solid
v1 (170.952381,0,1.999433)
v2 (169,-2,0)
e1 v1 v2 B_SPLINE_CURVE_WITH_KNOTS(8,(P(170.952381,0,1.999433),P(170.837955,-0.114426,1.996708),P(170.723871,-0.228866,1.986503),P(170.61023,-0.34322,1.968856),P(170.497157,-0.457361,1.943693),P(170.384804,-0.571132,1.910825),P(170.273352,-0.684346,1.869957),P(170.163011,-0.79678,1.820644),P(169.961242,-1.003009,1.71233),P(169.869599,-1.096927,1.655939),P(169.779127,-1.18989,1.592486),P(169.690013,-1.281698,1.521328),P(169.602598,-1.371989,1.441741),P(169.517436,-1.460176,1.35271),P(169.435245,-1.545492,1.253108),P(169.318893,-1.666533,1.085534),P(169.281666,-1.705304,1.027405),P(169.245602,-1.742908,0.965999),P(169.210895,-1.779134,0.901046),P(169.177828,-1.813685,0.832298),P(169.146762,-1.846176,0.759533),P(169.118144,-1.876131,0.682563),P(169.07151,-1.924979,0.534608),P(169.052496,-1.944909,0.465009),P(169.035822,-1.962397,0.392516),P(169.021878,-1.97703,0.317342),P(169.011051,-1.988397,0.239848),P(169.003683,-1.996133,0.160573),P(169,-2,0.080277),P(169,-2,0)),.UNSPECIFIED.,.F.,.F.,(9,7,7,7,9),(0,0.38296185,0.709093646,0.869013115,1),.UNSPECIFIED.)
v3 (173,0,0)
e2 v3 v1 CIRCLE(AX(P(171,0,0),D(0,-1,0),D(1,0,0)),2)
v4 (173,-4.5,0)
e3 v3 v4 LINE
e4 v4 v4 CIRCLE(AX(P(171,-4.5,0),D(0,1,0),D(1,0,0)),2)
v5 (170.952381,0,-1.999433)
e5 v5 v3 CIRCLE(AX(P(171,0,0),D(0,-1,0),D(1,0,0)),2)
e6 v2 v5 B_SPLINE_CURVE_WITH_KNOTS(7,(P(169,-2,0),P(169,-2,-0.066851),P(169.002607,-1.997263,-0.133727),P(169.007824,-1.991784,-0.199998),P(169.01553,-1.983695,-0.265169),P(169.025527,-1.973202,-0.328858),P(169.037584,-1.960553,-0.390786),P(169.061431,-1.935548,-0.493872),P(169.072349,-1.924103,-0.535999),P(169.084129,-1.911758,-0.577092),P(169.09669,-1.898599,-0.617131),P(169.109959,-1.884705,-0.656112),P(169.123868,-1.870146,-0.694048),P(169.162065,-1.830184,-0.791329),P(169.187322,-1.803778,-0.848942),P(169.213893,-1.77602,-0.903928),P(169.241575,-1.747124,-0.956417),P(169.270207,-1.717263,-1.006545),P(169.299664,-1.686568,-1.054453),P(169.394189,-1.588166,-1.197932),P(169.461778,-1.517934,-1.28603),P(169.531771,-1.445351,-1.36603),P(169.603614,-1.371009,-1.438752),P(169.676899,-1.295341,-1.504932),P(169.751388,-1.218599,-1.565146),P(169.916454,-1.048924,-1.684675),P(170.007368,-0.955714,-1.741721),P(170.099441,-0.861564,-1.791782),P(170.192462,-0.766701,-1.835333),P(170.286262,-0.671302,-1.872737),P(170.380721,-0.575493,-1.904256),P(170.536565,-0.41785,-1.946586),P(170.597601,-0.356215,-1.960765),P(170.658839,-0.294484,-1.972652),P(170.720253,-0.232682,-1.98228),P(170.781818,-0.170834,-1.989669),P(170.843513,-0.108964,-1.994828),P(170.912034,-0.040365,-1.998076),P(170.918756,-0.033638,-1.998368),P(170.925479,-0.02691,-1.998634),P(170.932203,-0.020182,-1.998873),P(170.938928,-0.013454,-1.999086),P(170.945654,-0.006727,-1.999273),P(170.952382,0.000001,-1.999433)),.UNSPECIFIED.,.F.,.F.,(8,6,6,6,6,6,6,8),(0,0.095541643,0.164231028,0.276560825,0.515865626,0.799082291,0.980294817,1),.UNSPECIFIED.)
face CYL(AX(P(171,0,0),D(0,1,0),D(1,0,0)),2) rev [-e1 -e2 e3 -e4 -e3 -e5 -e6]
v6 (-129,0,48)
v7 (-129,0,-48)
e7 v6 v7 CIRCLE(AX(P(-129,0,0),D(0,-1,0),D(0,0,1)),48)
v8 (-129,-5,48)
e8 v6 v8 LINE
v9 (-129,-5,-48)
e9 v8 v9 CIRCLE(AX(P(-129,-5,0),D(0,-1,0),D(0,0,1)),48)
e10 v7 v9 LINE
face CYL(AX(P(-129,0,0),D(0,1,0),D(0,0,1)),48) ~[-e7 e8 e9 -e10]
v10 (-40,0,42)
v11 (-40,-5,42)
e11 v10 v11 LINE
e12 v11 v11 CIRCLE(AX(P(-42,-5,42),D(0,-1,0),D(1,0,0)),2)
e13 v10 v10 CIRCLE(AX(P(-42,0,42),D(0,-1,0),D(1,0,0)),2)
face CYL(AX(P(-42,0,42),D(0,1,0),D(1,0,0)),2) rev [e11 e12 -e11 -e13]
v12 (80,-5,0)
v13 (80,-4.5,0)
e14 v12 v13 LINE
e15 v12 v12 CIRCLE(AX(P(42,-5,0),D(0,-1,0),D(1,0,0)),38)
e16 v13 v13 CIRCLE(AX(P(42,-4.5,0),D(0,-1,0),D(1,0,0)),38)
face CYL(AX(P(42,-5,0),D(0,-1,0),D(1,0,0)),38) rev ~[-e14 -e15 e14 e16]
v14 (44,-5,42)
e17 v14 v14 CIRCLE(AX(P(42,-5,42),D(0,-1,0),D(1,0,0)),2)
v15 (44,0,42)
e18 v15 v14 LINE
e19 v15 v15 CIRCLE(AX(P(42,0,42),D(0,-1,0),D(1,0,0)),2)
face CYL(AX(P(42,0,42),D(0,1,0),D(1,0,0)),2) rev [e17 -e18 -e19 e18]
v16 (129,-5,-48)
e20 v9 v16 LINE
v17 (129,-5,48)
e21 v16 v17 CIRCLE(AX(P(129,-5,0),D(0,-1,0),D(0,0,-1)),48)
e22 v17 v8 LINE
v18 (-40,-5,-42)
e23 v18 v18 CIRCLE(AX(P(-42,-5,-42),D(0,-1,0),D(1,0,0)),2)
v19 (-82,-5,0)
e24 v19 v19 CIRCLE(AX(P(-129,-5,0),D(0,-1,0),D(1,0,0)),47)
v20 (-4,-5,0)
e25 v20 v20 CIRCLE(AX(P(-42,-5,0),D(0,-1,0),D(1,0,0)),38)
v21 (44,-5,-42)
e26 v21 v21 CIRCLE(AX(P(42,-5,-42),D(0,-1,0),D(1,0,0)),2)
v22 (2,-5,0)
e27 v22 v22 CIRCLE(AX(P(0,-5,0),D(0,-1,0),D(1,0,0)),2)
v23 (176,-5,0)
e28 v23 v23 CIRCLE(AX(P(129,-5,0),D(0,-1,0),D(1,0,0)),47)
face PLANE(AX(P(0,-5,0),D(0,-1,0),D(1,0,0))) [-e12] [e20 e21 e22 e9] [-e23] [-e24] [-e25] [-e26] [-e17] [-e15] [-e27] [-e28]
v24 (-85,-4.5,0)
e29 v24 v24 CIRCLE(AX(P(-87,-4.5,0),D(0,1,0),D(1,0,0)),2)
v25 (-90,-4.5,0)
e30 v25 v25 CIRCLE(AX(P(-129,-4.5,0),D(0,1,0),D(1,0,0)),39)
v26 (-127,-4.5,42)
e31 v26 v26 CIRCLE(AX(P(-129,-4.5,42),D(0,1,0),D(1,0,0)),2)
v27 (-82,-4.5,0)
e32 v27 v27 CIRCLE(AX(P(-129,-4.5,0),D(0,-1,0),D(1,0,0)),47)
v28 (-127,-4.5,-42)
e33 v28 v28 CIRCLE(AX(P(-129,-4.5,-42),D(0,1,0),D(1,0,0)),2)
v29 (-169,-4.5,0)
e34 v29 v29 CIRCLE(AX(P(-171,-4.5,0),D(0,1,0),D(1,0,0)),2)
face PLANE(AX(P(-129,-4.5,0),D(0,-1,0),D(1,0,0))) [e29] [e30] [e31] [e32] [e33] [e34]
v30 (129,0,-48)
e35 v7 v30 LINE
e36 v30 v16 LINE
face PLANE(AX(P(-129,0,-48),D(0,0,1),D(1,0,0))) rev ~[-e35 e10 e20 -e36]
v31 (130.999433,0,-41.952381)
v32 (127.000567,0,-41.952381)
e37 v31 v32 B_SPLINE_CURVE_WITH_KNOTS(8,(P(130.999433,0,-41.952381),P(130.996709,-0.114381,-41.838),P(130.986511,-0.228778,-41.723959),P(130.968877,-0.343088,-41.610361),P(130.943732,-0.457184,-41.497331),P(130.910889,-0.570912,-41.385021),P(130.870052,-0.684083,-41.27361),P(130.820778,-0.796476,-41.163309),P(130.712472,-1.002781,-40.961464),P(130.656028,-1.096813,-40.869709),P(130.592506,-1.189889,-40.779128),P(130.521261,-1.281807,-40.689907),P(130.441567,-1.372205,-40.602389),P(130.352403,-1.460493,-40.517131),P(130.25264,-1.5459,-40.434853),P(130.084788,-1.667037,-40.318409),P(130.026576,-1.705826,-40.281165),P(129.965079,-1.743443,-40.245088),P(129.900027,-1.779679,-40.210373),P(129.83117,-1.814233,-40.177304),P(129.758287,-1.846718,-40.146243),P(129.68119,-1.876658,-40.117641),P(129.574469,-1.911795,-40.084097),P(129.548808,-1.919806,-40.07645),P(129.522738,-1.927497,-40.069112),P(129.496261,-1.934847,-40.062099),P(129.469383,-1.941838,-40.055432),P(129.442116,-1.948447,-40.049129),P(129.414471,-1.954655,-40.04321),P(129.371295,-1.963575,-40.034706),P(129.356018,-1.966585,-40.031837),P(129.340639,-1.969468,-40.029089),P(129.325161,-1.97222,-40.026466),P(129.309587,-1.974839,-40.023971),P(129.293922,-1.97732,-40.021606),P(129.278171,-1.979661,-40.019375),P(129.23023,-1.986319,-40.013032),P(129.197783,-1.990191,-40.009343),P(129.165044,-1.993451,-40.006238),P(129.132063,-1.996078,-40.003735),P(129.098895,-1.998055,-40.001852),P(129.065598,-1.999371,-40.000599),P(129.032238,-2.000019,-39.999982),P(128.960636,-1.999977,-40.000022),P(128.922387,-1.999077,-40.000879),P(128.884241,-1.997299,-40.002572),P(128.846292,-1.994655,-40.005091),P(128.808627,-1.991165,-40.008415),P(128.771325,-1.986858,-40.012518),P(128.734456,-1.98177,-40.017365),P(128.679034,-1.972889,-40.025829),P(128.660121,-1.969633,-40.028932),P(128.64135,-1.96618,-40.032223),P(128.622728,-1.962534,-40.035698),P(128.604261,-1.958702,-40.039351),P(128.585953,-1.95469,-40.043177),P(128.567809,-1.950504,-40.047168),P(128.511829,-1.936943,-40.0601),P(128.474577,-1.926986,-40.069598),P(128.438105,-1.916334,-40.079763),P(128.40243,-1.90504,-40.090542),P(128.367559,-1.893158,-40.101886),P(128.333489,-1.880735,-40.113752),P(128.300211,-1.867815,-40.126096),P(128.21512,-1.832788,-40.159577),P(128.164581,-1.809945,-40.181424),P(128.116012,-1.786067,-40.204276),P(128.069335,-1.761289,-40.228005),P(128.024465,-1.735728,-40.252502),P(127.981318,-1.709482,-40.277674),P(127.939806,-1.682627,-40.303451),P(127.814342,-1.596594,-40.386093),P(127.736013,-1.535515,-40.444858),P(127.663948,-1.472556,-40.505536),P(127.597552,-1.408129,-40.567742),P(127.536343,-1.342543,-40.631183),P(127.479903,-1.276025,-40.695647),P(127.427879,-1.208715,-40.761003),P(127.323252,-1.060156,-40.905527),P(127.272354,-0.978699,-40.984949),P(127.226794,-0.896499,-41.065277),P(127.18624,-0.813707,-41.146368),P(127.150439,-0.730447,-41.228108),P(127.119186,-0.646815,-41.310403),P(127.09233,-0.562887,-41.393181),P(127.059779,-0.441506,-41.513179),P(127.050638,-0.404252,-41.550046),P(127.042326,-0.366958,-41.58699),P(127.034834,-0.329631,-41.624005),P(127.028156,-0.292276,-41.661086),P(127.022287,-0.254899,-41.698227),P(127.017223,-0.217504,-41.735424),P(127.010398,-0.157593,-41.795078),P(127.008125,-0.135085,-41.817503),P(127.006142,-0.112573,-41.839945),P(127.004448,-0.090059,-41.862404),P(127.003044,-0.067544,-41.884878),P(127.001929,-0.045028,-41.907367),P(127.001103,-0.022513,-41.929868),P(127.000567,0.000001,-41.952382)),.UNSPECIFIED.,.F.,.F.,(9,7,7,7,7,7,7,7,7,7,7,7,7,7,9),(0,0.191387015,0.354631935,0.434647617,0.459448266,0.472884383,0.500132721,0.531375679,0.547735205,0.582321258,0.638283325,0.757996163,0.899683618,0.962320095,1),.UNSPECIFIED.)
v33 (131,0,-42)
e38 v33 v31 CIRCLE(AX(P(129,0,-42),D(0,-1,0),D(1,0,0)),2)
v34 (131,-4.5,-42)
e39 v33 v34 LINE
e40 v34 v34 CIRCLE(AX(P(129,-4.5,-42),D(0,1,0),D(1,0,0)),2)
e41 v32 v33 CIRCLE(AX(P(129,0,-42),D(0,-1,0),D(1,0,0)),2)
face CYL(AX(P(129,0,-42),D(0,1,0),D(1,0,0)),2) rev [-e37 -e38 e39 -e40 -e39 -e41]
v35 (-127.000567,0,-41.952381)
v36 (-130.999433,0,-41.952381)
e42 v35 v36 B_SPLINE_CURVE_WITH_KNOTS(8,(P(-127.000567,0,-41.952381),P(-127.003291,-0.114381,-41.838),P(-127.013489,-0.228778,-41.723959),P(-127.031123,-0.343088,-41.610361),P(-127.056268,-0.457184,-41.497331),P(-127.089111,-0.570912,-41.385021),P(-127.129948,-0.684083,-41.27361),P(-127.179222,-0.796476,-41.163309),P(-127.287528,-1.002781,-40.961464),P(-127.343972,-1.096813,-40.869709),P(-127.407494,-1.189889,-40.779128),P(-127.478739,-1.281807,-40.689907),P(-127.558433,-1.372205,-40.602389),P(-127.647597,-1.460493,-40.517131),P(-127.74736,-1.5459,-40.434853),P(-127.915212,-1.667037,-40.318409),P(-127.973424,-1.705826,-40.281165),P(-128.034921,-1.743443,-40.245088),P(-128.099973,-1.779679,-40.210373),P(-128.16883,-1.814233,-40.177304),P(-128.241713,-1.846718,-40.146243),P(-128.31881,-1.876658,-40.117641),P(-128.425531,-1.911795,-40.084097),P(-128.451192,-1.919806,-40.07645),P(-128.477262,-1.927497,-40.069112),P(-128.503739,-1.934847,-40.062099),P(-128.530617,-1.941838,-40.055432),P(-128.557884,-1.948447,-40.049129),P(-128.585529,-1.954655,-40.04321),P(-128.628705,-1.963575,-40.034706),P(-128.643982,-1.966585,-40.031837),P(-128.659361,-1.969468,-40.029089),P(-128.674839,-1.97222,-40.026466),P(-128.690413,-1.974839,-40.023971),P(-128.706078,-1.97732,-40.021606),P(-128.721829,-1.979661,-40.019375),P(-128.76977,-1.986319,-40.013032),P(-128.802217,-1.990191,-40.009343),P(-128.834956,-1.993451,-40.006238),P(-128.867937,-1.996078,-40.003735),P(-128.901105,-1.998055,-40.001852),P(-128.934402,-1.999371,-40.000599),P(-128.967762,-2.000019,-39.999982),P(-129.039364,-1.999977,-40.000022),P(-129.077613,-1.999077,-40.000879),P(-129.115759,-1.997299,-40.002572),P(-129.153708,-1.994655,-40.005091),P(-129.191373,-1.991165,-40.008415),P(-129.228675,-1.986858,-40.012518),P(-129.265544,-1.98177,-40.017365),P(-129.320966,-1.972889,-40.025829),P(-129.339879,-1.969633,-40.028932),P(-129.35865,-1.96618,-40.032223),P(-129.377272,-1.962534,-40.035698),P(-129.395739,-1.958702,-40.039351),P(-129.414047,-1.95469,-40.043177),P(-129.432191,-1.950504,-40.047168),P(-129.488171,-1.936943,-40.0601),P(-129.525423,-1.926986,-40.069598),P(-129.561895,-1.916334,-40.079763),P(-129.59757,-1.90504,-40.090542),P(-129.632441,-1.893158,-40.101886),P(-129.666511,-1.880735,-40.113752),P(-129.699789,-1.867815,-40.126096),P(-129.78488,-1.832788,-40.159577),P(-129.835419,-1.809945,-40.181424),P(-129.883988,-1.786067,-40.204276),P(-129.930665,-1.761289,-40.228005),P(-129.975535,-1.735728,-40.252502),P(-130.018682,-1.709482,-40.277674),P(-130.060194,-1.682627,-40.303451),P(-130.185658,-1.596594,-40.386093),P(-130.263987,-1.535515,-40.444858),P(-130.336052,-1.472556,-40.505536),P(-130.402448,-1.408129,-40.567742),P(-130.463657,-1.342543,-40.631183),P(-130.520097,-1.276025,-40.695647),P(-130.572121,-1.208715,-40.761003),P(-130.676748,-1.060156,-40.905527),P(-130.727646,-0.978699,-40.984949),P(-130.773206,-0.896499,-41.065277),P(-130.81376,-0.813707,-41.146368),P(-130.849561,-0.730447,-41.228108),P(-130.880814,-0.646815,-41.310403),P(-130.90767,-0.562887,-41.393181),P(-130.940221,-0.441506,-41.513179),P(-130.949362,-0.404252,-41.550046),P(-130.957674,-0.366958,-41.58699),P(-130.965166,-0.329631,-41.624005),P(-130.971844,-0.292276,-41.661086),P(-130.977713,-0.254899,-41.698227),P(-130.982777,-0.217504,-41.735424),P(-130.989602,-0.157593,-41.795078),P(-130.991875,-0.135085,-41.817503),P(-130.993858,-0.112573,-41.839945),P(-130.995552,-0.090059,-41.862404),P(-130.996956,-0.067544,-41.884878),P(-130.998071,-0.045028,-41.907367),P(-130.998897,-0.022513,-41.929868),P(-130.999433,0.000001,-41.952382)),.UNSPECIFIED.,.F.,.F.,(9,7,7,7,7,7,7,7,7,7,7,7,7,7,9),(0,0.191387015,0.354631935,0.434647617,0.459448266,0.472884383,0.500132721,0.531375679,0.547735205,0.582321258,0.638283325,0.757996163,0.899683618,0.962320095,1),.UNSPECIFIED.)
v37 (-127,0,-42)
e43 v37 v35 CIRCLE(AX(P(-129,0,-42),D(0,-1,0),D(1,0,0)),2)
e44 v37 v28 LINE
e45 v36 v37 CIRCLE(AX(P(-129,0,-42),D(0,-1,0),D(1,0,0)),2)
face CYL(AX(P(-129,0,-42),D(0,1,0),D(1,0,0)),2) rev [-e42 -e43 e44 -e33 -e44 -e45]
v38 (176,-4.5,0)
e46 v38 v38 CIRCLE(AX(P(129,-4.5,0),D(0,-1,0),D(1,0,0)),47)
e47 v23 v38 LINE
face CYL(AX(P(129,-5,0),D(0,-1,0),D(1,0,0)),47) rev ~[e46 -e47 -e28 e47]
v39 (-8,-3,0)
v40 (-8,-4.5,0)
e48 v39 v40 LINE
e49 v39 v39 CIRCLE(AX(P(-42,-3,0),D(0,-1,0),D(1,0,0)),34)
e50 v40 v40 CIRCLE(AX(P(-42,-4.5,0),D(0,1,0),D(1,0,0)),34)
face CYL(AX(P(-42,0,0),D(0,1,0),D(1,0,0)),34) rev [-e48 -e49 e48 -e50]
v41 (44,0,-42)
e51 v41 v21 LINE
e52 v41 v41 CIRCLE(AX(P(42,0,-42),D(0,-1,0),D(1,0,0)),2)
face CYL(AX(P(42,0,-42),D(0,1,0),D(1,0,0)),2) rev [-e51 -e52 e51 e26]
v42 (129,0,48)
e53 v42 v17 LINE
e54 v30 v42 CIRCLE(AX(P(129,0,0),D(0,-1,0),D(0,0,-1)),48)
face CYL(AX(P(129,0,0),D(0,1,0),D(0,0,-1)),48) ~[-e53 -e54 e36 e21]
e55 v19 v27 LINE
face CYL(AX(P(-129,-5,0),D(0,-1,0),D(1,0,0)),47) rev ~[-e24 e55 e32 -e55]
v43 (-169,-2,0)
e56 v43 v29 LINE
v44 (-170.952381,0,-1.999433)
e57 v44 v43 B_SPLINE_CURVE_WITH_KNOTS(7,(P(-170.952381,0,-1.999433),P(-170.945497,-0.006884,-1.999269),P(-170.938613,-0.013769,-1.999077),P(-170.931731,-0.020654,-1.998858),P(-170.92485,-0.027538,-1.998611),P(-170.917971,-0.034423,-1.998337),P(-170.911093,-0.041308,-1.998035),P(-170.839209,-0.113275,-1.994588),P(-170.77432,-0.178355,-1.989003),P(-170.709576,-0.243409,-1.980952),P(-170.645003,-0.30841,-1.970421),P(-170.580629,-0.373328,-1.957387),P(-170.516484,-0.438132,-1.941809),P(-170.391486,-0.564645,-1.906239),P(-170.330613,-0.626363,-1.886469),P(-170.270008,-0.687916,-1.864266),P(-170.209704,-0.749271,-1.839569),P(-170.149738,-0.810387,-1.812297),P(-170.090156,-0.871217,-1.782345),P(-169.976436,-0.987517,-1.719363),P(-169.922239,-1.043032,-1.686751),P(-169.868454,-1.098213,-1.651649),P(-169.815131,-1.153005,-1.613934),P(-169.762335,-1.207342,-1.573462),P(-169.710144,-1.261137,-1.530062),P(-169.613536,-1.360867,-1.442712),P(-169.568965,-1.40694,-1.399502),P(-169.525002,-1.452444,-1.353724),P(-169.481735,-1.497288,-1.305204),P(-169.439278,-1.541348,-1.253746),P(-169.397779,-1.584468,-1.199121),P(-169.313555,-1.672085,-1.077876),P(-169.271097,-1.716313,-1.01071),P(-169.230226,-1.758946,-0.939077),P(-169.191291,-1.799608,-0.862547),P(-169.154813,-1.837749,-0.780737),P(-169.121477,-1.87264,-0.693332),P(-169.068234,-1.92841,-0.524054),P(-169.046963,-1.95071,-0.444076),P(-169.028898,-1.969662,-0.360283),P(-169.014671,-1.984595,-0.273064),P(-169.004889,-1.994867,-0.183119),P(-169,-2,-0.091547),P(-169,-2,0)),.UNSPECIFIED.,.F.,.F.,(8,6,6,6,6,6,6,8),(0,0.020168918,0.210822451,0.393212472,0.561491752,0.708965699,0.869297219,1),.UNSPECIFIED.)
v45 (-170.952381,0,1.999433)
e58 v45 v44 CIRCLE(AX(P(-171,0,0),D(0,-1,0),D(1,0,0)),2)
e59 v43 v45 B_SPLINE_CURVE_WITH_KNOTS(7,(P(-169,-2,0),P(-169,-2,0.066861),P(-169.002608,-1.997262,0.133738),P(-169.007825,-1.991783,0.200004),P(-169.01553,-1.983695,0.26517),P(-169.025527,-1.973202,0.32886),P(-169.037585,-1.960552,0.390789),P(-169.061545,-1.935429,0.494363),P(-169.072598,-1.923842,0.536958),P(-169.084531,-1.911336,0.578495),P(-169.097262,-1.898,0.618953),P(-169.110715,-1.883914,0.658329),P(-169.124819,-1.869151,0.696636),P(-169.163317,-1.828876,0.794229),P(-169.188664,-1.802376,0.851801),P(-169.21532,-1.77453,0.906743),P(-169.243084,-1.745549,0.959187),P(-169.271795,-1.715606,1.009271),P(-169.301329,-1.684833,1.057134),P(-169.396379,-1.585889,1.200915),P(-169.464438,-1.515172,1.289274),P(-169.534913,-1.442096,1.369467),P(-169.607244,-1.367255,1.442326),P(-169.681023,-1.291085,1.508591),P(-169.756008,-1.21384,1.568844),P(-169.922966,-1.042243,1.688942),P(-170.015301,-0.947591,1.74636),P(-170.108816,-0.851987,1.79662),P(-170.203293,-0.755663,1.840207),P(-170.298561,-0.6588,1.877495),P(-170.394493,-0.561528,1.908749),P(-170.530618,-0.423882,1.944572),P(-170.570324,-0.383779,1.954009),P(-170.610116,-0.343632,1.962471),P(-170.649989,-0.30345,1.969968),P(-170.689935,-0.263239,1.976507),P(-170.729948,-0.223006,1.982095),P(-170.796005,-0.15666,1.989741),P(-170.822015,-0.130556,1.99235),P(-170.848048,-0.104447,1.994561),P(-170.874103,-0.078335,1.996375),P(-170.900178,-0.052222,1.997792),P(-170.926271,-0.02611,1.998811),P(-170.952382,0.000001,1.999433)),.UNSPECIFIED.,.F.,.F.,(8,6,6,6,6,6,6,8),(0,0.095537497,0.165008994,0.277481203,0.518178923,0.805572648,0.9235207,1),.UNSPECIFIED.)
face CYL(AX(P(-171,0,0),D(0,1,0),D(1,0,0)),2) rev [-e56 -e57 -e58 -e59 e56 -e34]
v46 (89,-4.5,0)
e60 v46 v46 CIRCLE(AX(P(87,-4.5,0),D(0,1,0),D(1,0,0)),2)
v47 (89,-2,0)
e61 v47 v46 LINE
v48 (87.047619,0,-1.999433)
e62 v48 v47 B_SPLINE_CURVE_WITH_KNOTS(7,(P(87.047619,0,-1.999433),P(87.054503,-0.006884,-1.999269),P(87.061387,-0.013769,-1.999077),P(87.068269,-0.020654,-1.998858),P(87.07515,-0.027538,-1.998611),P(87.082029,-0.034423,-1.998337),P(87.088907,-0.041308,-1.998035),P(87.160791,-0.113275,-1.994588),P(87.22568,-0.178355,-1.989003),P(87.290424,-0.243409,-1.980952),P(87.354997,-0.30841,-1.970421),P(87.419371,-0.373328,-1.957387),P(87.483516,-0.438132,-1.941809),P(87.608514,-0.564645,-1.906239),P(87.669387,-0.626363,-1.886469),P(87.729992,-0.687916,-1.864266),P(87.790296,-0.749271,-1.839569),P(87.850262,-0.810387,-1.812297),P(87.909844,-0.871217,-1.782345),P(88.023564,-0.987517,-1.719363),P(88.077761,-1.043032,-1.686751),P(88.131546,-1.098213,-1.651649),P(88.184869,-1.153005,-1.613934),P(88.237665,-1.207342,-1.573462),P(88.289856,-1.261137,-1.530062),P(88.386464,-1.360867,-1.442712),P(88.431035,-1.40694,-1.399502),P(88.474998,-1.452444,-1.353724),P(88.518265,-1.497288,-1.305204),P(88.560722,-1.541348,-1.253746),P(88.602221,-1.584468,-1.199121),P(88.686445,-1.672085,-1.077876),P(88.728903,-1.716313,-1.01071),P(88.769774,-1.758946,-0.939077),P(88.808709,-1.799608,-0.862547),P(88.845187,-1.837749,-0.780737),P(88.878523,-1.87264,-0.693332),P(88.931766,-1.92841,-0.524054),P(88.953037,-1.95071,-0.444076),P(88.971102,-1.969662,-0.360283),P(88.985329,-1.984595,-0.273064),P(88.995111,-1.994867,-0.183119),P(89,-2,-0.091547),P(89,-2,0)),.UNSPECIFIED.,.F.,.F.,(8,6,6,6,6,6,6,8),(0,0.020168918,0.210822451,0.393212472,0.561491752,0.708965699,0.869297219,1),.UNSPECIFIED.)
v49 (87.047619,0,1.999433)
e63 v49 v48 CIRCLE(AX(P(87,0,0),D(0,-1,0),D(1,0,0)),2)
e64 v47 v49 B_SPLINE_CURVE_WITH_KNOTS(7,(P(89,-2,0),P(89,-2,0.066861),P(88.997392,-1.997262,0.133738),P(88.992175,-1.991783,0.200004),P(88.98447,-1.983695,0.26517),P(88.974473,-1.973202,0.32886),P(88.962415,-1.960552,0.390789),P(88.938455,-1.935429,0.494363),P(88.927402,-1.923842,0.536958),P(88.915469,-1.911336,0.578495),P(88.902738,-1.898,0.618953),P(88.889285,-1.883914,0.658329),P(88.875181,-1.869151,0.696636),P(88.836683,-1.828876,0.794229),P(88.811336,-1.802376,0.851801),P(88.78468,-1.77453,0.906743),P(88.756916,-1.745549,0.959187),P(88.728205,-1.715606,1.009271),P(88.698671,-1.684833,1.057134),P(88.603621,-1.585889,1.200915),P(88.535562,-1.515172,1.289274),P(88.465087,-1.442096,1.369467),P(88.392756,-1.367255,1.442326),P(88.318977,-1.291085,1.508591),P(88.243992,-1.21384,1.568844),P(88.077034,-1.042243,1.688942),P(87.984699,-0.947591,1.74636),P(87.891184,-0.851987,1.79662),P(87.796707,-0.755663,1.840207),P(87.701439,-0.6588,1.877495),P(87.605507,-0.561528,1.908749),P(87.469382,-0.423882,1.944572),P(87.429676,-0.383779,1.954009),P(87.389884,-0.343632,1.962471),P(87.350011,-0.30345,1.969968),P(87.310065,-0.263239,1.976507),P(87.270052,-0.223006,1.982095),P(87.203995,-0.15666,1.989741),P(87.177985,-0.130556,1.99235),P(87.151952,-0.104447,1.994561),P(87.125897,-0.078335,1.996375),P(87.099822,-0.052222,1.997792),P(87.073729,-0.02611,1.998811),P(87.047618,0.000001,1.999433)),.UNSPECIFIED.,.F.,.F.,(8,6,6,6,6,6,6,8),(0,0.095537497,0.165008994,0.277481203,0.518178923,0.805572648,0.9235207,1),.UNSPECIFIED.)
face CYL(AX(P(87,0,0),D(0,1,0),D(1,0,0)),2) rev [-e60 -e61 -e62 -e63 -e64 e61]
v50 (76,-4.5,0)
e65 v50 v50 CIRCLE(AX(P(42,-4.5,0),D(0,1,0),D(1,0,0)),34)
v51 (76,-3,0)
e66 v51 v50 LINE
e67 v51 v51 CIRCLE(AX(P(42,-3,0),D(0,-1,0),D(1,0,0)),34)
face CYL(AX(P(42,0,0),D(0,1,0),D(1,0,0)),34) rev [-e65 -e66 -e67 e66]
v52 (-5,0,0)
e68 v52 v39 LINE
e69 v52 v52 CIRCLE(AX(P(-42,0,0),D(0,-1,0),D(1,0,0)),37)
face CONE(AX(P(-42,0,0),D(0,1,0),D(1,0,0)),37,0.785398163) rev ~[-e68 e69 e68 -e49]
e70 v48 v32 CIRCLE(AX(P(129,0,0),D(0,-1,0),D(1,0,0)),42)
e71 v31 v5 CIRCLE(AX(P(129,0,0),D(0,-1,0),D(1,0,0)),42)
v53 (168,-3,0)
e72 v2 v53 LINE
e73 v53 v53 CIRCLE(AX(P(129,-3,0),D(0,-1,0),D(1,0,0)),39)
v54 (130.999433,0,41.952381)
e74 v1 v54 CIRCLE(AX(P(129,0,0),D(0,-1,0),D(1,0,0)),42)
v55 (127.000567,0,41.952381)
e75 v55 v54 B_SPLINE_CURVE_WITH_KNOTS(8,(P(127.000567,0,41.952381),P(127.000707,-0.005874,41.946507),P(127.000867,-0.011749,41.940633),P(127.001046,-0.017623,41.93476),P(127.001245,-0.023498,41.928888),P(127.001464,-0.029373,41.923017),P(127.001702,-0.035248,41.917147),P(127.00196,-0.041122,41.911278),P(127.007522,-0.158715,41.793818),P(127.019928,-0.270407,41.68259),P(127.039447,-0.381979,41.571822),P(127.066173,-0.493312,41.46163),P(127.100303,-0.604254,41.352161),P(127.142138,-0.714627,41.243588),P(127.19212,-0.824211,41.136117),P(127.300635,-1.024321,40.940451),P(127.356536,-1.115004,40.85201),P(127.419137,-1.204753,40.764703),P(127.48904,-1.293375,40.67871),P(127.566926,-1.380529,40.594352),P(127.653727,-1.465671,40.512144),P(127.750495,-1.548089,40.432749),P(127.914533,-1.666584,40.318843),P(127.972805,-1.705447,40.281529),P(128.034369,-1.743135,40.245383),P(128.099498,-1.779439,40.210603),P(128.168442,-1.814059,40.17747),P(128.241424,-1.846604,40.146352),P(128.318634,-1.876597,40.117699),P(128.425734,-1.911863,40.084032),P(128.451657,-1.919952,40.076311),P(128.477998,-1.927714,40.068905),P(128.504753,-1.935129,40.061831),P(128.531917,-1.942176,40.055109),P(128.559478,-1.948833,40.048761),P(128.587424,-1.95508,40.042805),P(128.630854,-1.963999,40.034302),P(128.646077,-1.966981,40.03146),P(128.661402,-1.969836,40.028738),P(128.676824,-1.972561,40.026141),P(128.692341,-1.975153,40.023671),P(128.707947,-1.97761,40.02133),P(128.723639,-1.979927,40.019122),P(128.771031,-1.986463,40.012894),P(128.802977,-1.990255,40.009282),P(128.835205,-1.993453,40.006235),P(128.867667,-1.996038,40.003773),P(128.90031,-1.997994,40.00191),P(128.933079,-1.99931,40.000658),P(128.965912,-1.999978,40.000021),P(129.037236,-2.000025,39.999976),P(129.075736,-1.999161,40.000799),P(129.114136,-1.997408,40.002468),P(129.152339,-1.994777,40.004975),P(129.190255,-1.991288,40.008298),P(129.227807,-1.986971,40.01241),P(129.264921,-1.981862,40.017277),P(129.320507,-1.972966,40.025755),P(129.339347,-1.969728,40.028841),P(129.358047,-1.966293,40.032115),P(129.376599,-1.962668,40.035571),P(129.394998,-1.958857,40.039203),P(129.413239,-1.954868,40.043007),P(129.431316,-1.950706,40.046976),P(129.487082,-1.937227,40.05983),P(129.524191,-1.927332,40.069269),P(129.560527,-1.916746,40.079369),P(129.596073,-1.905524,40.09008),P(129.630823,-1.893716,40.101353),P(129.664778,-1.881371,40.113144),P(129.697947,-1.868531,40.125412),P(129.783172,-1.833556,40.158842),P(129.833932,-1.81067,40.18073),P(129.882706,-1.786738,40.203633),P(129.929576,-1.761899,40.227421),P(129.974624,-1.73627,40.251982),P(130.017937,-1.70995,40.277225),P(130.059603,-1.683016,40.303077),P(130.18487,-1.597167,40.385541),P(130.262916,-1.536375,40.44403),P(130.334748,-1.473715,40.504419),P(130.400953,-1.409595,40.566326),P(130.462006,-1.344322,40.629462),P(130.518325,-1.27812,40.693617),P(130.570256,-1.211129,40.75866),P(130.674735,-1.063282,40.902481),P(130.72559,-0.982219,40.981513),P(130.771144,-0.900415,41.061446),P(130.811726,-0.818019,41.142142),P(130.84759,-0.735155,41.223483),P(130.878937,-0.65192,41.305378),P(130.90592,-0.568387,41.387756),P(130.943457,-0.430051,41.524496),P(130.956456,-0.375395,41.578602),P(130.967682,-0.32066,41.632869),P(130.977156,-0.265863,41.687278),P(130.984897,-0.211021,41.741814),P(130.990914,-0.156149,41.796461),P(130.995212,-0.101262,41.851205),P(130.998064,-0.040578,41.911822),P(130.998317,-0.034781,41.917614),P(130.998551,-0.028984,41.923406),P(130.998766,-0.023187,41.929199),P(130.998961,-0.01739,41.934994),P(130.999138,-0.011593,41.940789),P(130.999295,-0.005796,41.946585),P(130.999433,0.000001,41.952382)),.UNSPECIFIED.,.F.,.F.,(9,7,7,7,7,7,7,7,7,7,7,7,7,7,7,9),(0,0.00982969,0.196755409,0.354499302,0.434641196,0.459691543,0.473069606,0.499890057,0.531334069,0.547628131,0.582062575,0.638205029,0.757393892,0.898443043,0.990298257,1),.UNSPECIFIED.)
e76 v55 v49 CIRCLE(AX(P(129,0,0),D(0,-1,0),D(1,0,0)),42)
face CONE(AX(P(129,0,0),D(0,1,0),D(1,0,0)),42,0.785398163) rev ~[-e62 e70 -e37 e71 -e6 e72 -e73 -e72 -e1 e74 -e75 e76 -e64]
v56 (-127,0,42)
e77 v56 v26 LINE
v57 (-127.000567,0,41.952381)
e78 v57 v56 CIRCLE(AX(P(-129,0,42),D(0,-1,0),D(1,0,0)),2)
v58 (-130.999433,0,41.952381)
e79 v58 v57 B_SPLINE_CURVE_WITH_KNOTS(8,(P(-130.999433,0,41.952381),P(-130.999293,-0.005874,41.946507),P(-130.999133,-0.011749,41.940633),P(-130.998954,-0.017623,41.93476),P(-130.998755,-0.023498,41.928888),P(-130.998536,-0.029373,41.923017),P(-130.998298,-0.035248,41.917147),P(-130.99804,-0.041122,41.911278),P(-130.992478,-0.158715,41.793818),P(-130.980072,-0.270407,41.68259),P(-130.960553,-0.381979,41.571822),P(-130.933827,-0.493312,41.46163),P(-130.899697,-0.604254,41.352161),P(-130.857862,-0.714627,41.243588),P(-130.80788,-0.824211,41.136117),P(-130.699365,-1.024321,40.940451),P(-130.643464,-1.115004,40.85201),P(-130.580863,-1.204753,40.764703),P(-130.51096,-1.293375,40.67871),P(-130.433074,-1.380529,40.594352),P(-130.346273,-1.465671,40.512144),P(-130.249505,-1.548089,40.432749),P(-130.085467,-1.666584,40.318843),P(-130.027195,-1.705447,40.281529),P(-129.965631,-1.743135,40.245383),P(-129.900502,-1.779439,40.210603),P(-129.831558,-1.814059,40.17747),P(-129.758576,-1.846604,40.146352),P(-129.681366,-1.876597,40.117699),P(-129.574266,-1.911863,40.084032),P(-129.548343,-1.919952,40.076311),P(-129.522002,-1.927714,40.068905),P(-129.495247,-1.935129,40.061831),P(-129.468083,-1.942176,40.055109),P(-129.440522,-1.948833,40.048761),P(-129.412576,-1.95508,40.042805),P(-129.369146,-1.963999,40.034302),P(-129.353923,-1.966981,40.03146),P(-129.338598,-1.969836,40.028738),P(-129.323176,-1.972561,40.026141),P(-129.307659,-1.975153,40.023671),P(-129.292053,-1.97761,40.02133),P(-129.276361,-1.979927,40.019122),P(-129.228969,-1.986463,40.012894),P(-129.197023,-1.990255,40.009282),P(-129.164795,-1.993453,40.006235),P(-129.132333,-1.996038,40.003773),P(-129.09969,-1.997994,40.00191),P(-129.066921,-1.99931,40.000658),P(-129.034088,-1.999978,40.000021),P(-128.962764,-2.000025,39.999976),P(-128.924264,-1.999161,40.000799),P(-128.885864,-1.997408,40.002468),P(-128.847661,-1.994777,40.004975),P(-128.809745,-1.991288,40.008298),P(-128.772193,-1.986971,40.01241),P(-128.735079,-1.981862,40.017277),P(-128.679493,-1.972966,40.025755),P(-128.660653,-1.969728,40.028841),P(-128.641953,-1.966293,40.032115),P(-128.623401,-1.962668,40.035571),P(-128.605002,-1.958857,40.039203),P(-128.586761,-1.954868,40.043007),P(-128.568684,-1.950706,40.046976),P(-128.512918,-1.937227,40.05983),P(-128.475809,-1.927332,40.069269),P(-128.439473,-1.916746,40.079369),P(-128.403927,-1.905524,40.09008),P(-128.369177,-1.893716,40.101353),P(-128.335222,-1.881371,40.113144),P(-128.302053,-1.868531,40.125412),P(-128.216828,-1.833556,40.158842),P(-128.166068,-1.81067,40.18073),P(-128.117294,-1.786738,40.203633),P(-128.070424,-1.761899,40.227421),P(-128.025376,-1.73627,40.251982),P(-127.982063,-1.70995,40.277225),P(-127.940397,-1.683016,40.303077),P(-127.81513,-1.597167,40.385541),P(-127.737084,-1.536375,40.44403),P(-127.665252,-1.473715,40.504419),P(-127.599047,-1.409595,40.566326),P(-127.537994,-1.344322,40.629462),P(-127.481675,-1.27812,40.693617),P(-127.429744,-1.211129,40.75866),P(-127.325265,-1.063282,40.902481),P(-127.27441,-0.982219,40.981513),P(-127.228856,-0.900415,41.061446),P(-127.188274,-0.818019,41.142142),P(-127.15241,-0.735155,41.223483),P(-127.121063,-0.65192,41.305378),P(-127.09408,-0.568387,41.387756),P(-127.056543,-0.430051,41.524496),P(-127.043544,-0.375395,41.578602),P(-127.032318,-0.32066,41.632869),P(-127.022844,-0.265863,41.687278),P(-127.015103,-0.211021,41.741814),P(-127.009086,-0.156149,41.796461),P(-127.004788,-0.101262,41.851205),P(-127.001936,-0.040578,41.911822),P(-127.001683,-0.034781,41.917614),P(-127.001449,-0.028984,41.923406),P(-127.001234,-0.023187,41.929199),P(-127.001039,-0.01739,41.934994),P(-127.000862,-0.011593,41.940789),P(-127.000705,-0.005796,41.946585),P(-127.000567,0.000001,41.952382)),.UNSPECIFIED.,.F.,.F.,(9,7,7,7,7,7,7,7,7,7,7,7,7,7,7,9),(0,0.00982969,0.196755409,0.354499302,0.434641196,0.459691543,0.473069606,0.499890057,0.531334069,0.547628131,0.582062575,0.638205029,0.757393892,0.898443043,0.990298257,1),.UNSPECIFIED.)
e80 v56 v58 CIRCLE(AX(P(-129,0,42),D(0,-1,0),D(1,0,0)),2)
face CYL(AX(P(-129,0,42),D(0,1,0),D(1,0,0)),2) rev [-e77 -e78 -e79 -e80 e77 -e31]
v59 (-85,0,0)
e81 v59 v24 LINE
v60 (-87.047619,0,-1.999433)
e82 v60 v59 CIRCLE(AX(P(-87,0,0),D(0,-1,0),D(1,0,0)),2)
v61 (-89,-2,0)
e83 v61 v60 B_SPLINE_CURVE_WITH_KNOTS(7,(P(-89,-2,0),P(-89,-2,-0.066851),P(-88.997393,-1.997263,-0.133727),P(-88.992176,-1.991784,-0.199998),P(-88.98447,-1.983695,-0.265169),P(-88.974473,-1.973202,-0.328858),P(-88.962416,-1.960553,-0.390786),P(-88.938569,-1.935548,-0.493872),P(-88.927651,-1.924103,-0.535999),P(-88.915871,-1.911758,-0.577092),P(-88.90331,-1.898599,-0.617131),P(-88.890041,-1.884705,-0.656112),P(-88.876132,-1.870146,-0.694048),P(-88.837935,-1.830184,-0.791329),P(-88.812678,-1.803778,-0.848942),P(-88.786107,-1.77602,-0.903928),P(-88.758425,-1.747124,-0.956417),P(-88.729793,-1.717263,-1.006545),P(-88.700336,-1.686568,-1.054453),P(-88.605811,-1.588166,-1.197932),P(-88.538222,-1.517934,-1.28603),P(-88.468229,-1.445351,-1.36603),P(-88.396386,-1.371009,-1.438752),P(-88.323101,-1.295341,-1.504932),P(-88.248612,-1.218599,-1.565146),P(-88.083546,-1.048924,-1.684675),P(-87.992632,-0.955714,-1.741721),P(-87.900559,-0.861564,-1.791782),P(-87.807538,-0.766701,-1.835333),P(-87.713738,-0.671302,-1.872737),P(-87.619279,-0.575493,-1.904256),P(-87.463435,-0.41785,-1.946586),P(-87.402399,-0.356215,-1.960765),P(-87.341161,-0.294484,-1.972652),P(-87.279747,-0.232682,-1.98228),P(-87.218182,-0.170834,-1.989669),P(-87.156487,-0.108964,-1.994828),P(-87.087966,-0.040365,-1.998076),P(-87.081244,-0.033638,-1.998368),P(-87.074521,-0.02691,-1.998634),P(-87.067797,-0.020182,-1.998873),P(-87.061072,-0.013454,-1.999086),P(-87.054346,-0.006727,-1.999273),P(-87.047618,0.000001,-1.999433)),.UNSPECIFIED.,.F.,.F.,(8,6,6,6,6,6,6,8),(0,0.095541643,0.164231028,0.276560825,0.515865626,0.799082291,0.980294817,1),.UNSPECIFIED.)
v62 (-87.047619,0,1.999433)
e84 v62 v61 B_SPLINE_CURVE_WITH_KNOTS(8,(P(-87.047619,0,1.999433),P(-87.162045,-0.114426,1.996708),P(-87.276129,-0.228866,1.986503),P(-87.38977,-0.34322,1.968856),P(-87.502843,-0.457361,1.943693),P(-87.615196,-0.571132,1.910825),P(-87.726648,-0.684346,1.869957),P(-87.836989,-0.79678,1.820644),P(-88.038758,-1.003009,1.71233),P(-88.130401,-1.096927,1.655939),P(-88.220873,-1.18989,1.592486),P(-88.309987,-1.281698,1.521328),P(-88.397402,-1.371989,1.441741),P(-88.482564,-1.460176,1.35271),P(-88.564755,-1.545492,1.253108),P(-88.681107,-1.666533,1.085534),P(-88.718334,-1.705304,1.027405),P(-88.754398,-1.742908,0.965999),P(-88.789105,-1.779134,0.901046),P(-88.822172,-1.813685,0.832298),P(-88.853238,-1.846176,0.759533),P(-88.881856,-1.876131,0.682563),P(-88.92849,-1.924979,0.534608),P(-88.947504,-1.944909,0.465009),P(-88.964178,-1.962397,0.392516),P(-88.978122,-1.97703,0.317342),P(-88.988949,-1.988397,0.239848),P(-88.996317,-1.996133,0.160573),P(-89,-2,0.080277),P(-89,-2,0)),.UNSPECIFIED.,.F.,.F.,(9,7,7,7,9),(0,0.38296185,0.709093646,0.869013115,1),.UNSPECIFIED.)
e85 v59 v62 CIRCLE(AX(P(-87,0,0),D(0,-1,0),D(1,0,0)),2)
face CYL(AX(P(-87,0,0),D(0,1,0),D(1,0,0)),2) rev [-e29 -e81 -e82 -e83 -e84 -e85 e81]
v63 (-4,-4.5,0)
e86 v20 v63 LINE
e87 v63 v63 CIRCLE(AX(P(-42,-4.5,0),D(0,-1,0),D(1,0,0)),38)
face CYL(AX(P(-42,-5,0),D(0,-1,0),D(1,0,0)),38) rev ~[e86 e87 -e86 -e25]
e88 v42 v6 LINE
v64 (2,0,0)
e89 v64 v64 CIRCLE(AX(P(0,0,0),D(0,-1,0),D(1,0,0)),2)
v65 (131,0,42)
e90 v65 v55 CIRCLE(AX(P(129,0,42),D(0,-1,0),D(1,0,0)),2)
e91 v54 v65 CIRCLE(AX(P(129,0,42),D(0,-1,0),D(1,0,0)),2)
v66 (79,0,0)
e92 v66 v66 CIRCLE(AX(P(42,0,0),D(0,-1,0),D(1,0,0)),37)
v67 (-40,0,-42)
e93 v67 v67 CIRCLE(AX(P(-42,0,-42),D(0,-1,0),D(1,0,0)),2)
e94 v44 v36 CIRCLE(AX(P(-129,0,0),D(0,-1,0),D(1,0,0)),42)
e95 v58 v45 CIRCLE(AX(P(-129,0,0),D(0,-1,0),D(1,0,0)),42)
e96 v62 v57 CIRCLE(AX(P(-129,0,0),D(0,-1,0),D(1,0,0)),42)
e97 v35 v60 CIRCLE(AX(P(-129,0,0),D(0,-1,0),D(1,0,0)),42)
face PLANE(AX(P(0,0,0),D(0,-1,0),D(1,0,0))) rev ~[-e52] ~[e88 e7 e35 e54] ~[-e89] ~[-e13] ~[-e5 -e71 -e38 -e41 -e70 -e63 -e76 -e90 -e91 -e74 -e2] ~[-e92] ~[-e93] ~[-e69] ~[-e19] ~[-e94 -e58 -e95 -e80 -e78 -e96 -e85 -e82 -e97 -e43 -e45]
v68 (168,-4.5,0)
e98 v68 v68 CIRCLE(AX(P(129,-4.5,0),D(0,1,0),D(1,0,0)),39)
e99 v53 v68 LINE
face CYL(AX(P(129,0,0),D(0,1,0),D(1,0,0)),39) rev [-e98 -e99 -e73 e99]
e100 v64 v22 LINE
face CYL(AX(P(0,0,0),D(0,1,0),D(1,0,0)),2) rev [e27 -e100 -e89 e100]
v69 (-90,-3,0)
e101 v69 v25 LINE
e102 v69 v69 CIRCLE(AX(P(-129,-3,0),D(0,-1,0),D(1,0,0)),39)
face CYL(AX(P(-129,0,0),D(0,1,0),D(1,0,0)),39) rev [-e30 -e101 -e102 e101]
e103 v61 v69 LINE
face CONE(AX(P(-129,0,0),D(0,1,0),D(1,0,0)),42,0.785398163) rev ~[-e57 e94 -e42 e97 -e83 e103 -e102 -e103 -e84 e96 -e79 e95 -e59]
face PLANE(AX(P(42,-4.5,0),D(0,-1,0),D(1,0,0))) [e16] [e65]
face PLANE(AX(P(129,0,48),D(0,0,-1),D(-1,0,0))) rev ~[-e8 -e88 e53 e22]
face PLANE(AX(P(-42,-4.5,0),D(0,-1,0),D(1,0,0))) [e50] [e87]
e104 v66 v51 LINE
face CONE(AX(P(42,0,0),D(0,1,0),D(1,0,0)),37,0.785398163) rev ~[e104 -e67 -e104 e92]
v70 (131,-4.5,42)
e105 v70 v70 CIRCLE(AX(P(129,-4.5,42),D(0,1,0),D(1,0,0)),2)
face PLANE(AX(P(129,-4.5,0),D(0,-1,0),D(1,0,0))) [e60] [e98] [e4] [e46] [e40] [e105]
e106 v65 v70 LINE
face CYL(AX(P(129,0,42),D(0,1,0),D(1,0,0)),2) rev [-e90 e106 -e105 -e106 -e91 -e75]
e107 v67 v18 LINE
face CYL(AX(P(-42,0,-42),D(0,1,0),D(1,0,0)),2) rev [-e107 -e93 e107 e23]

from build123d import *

# Parameters (mm, degrees)
F0_R     = 2
F0_R_2   = 39
F0_R_3   = 34
F1_DEPTH = 5
F2_R     = 38
F2_R_2   = 47
F3_DEPTH = 0.5


# Not quite as in the source:
# - a fillet or chamfer that OpenCascade refuses, or shapes differently, is made with other operations: its cross-section is extruded or revolved along the edge and cut away or added


with BuildPart() as f1:
    # F0 (on Front) → F1 (new body)
    with BuildSketch(Plane.XZ):
        with BuildLine():
            ThreePointArc((129, -48), (177, 0), (129, 48))
            Line((129, 48), (0, 48))
            Line((0, 48), (-129, 48))
            ThreePointArc((-129, 48), (-177, 0), (-129, -48))
            Line((-129, -48), (0, -48))
            Line((0, -48), (129, -48))
        make_face()
        with Locations((-129, -42)):
            Circle(F0_R, mode=Mode.SUBTRACT)
        with Locations((-42, -42)):
            Circle(F0_R, mode=Mode.SUBTRACT)
        with Locations((42, -42)):
            Circle(F0_R, mode=Mode.SUBTRACT)
        with Locations((129, -42)):
            Circle(F0_R, mode=Mode.SUBTRACT)
        with Locations((-171, 0)):
            Circle(F0_R, mode=Mode.SUBTRACT)
        with Locations((-129, 0)):
            Circle(F0_R_2, mode=Mode.SUBTRACT)
        with Locations((-87, 0)):
            Circle(F0_R, mode=Mode.SUBTRACT)
        with Locations((-42, 0)):
            Circle(F0_R_3, mode=Mode.SUBTRACT)
        with Locations((-129, 42)):
            Circle(F0_R, mode=Mode.SUBTRACT)
        with Locations((-42, 42)):
            Circle(F0_R, mode=Mode.SUBTRACT)
        Circle(F0_R, mode=Mode.SUBTRACT)
        with Locations((42, 0)):
            Circle(F0_R_3, mode=Mode.SUBTRACT)
        with Locations((87, 0)):
            Circle(F0_R, mode=Mode.SUBTRACT)
        with Locations((129, 0)):
            Circle(F0_R_2, mode=Mode.SUBTRACT)
        with Locations((171, 0)):
            Circle(F0_R, mode=Mode.SUBTRACT)
        with Locations((42, 42)):
            Circle(F0_R, mode=Mode.SUBTRACT)
        with Locations((129, 42)):
            Circle(F0_R, mode=Mode.SUBTRACT)
    extrude(amount=F1_DEPTH)

    # F2 (on face) → F3 (cut)
    with BuildSketch(Plane.XZ.offset(5)):
        with Locations((42, 0)):
            Circle(F2_R)
        with Locations((-42, 0)):
            Circle(F2_R)
        with Locations((129, 0)):
            Circle(F2_R_2)
        with Locations((-129, 0)):
            Circle(F2_R_2)
    extrude(amount=-F3_DEPTH, mode=Mode.SUBTRACT)

    # F4: chamfer of 3 on 4 edges, made by hand

    # F4_s1 → F4_t2 (revolve, cut)
    with BuildSketch(Plane.XY):
        Polygon((-87, 0), (-90, -3), (-90, 0), align=None)
    revolve(axis=Axis((-129, 0, 0), (0, -1, 0)), mode=Mode.SUBTRACT)

    # F4_s3 → F4_t4 (revolve, cut)
    with BuildSketch(Plane.XY):
        Polygon((-5, 0), (-8, -3), (-8, 0), align=None)
    revolve(axis=Axis((-42, 0, 0), (0, -1, 0)), mode=Mode.SUBTRACT)

    # F4_s5 → F4_t6 (revolve, cut)
    with BuildSketch(Plane.XY):
        Polygon((79, 0), (76, -3), (76, 0), align=None)
    revolve(axis=Axis((42, 0, 0), (0, -1, 0)), mode=Mode.SUBTRACT)

    # F4_s7 → F4_t8 (revolve, cut)
    with BuildSketch(Plane.XY):
        Polygon((171, 0), (168, -3), (168, 0), align=None)
    revolve(axis=Axis((129, 0, 0), (0, -1, 0)), mode=Mode.SUBTRACT)


solid = f1.part
